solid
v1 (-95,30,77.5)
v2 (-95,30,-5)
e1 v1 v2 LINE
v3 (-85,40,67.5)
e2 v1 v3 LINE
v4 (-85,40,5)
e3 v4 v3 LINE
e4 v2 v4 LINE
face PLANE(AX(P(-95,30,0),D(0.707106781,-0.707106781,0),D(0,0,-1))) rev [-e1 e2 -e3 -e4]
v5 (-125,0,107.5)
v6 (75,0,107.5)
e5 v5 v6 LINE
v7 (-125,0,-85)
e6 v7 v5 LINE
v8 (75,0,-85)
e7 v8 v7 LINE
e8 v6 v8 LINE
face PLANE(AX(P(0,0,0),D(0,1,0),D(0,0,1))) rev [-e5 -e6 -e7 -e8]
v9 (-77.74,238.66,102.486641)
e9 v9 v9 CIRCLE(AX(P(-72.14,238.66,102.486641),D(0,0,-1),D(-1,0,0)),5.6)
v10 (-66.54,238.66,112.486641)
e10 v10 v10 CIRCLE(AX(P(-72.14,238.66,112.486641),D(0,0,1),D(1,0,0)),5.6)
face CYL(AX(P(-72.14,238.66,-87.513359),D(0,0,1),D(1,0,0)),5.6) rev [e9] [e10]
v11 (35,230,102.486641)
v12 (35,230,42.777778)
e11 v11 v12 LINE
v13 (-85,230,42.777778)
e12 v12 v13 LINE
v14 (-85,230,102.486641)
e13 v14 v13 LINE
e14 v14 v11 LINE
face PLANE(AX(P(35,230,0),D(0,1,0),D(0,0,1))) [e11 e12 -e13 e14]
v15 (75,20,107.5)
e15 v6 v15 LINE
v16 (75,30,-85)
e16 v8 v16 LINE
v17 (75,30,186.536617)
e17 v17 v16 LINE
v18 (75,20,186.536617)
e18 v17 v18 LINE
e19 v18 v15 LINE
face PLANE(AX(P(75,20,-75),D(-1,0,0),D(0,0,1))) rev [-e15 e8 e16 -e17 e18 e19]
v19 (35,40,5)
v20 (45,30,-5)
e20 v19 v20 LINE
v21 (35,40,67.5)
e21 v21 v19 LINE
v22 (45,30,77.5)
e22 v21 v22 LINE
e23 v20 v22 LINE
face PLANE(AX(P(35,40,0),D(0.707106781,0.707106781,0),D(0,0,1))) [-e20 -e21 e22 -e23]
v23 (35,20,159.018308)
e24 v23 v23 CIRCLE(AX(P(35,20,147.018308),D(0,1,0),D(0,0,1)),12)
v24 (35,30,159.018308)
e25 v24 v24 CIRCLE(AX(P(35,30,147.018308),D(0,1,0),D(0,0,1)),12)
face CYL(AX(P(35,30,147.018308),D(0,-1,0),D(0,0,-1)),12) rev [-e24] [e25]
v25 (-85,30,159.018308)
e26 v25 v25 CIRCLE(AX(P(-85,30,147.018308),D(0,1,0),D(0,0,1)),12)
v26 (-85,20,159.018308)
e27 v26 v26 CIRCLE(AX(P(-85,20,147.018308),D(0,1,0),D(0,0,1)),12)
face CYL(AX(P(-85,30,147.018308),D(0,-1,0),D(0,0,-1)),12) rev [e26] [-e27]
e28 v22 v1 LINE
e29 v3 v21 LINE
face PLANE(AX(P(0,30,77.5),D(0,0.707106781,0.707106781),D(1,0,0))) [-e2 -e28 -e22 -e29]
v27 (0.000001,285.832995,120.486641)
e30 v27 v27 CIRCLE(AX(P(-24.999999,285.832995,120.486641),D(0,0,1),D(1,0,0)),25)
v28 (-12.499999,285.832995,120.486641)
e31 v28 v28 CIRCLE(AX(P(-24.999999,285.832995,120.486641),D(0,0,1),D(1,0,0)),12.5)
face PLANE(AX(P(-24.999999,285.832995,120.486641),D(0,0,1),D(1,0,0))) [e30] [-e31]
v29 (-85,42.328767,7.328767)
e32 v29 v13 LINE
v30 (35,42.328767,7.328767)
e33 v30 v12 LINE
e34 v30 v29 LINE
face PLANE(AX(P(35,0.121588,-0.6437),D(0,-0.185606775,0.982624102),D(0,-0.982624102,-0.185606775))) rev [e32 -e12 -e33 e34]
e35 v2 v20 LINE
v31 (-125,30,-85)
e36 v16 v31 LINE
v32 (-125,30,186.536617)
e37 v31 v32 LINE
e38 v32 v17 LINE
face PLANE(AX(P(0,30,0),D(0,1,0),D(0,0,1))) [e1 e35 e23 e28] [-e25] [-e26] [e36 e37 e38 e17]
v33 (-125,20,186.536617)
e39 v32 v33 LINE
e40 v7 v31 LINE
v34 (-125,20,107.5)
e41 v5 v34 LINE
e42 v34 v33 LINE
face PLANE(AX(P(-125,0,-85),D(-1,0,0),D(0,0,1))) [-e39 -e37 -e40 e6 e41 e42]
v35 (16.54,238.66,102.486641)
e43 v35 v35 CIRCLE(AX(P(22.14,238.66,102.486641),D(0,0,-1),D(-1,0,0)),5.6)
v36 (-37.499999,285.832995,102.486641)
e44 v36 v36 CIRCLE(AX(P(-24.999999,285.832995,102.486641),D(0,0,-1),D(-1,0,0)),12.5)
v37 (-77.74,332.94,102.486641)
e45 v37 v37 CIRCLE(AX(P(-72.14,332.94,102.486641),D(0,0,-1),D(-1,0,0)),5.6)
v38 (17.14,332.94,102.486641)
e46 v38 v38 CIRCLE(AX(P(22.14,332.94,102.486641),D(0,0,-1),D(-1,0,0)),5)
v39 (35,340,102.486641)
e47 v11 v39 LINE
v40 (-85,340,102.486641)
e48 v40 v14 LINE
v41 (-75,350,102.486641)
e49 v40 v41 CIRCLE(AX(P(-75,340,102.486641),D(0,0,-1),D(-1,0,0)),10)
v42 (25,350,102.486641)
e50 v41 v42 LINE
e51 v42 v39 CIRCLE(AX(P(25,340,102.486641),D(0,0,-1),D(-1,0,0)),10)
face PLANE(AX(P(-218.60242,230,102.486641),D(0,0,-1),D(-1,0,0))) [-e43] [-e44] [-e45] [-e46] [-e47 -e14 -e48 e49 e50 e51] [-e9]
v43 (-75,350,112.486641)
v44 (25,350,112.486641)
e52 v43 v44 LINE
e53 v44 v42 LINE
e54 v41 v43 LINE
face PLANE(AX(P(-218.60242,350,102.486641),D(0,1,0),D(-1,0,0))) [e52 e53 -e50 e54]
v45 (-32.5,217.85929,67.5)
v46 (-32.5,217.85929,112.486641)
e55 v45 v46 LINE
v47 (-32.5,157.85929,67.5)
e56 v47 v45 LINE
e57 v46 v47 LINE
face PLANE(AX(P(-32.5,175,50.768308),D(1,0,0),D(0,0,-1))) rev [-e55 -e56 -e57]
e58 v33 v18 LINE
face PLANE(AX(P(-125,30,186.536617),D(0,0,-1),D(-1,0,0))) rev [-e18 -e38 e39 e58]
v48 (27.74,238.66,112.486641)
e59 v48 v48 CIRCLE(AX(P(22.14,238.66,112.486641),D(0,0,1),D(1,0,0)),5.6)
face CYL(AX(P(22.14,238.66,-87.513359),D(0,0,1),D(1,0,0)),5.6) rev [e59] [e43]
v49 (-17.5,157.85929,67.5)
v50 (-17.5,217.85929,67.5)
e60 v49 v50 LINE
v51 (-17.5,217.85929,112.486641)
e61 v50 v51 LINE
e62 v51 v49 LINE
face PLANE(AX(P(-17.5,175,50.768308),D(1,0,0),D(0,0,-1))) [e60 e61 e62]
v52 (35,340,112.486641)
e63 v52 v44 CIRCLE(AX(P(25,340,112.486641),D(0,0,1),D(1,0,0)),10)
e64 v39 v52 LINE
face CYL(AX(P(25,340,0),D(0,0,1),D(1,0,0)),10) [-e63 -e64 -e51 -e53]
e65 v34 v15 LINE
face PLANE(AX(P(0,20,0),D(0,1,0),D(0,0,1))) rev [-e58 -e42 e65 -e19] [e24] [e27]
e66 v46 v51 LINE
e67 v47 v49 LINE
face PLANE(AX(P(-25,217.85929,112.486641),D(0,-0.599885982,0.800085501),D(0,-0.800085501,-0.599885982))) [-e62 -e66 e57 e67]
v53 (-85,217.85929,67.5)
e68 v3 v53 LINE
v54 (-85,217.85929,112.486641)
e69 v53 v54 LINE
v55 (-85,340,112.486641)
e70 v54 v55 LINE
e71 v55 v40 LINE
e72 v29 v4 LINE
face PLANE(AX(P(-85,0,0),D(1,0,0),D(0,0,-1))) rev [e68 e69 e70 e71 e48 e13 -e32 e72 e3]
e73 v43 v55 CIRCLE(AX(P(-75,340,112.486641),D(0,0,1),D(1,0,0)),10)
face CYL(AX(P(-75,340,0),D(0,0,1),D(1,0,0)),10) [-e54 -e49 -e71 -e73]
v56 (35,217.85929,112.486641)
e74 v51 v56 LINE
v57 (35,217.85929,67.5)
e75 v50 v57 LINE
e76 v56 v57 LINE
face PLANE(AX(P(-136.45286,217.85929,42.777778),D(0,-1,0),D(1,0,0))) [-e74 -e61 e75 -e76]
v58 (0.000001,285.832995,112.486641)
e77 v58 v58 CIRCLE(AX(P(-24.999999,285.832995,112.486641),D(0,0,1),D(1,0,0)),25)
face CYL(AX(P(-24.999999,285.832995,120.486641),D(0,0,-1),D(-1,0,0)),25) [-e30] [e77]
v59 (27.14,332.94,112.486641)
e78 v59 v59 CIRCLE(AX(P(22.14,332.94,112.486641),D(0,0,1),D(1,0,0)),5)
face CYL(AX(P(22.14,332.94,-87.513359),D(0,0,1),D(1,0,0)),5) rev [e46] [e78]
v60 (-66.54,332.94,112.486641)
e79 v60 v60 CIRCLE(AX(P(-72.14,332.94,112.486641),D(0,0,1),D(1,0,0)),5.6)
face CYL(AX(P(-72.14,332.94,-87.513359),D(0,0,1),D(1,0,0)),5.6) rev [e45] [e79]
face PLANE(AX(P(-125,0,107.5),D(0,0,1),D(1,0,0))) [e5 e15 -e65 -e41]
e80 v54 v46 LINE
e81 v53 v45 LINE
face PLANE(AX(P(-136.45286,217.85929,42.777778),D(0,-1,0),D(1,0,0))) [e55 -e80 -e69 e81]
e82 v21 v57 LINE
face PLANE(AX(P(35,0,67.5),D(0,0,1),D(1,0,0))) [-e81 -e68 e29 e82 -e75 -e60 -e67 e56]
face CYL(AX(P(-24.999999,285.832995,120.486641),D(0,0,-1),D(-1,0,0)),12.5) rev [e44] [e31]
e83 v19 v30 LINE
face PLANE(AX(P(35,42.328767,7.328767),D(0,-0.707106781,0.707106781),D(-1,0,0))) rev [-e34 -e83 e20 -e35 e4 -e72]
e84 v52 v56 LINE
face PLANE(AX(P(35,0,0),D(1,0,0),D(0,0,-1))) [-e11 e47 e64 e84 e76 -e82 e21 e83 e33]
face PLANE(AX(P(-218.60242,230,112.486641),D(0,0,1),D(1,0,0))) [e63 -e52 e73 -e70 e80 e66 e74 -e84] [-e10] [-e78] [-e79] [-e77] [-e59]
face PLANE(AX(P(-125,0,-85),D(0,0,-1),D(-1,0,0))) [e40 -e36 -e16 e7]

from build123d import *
from OCP.BRepFilletAPI import BRepFilletAPI_MakeChamfer
from build123d.topology import SkipClean

# Parameters (mm, degrees)
SKETCH_1_W               = 150
SKETCH_1_H               = 150
EXTRUDE_1_DEPTH          = 20
SKETCH_2_W               = 200
SKETCH_2_H               = 170
EXTRUDE_2_DEPTH          = 20
SKETCH_3_W               = 200
SKETCH_3_H               = 22.5
EXTRUDE_3_DEPTH          = 20
SKETCH_4_W               = 200
SKETCH_4_H               = 101.536616744
SKETCH_4_R               = 12
EXTRUDE_4_DEPTH          = 10
SKETCH_5_W               = 200
SKETCH_5_H               = 170
EXTRUDE_5_DEPTH          = 10
SKETCH_6_W               = 12.361111111
SKETCH_6_H               = 120
EXTRUDE_6_DEPTH          = 60
CHAMFER_1_SIZE           = 10
CHAMFER_1_SIZE2          = 12.546778674
SKETCH_8_R               = 12.5
CUT_EXTRUDE_1_DEPTH      = 200
SKETCH_9_R               = 5.6
CUT_EXTRUDE_2_DEPTH      = 200
FILLET_1_R               = 10
SKETCH_10_R              = 40
SKETCH_10_R_2            = 8.532995409
EXTRUDE_7_DEPTH          = 5
SKETCH_11_R              = 12.5
CUT_EXTRUDE_3_DEPTH      = 200
SKETCH_12_W              = 50
SKETCH_12_H              = 12.140710291
EXTRUDE_8_DEPTH          = 120
EXTRUDE_9_DEPTH          = 120
SKETCH_14_R              = 5
SKETCH_14_R_2            = 5.6
CUT_EXTRUDE_4_DEPTH      = 200
CUT_EXTRUDE_5_DEPTH      = 428.663313117
CUT_EXTRUDE_5_DEPTH_BACK = 428.663313117
SKETCH_16_W              = 64.88929467
SKETCH_16_H              = 154.650571828
SKETCH_17_R              = 25
SKETCH_17_R_2            = 12.5
EXTRUDE_11_DEPTH         = 8
FILLET_2_R               = 10
RIB_1_REACH              = 411.018
SKETCH_18_WALL_W         = 895.028437604
SKETCH_18_WALL_H         = 15
CUT_EXTRUDE_6_DEPTH      = 425.676064177
CUT_EXTRUDE_6_DEPTH_BACK = 425.676064177
SKETCH_19_R              = 12.5


with BuildPart() as part:
    # 草图1 → 凸台-拉伸1 (new body)
    with BuildSketch(Plane(origin=(0, 0, 0), x_dir=(1, 0, 0), z_dir=(0, 1, 0))):
        Rectangle(SKETCH_1_W, SKETCH_1_H)
    extrude(amount=EXTRUDE_1_DEPTH)

    # 草图2 → 凸台-拉伸2 (add)
    with BuildSketch(Plane(origin=(0, 20, 0), x_dir=(1, 0, 0), z_dir=(0, 1, 0))):
        with Locations((-25, 0)):
            Rectangle(SKETCH_2_W, SKETCH_2_H)
    extrude(amount=-EXTRUDE_2_DEPTH)

    # 草图3 → 凸台-拉伸3 (add)
    with BuildSketch(Plane(origin=(0, 20, 0), x_dir=(1, 0, 0), z_dir=(0, 1, 0))):
        with Locations((-25, -96.25)):
            Rectangle(SKETCH_3_W, SKETCH_3_H)
    extrude(amount=-EXTRUDE_3_DEPTH)

    # 草图4 → 凸台-拉伸4 (add)
    with BuildSketch(Plane(origin=(0, 20, 0), x_dir=(1, 0, 0), z_dir=(0, 1, 0))):
        with Locations((-25, -135.768308372)):
            Rectangle(SKETCH_4_W, SKETCH_4_H)
        with Locations(Location((35, -147.018308372, 0), (0, 0, 270))):
            Circle(SKETCH_4_R, mode=Mode.SUBTRACT)
        with Locations(Location((-85, -147.018308372, 0), (0, 0, 270))):
            Circle(SKETCH_4_R, mode=Mode.SUBTRACT)
    extrude(amount=EXTRUDE_4_DEPTH)

    # 草图5 → 凸台-拉伸5 (add)
    with BuildSketch(Plane(origin=(0, 20, 0), x_dir=(1, 0, 0), z_dir=(0, 1, 0))):
        with Locations((-25, 0)):
            Rectangle(SKETCH_5_W, SKETCH_5_H)
    extrude(amount=EXTRUDE_5_DEPTH)

    # 草图6 → 凸台-拉伸6 (add, symmetric)
    with BuildSketch(Plane(origin=(-25, 0, 0), x_dir=(0, 0, -1), z_dir=(1, 0, 0))):
        Polygon((-67.5, 30), (-5, 30), (-42.777777778, 230), (-67.5, 230), align=None)
        with Locations((-61.319444445, 290)):
            Rectangle(SKETCH_6_W, SKETCH_6_H)
    extrude(amount=EXTRUDE_6_DEPTH, both=True)

    # 倒角1: one chamfer whose edges measure the first distance from different faces: ONE call of the kernel's chamfer builder (chamfer() names one face for all edges)
    chamfer_1_edges_1 = [part.edges().sort_by_distance(p)[0] for p in [
        (-85, 30, 36.25),
        (-25, 30, 67.5),
        (35, 30, 36.25),
    ]]
    chamfer_1_edges_2 = [part.edges().sort_by_distance(p)[0] for p in [
        (-25, 30, 5),
    ]]
    chamfer_1_side_2 = [part.faces().sort_by_distance(p)[0] for p in [
        (-121.627580479, 30, 50.768308372),
    ]]
    chamfer_1 = BRepFilletAPI_MakeChamfer(part.part.solid().wrapped)
    for e in chamfer_1_edges_1:
        chamfer_1.Add(CHAMFER_1_SIZE, e.wrapped)
    for e in chamfer_1_edges_2:
        chamfer_1.Add(CHAMFER_1_SIZE, CHAMFER_1_SIZE2, e.wrapped, chamfer_1_side_2[0].wrapped)  # the first distance lies on this face
    add(Compound.cast(chamfer_1.Shape()), mode=Mode.REPLACE)

    # 草图8 → 切除-拉伸1 (cut)
    with BuildSketch(Plane.XY.offset(67.5)):
        with Locations((-25, 285.8)):
            Circle(SKETCH_8_R)
    extrude(amount=-CUT_EXTRUDE_1_DEPTH, mode=Mode.SUBTRACT)

    # 草图9 → 切除-拉伸2 (cut)
    with BuildSketch(Plane.XY.offset(67.5)):
        with Locations((-72.14, 333.54)):
            Circle(SKETCH_9_R)
        with Locations((-72.14, 239.26)):
            Circle(SKETCH_9_R)
        with Locations((22.14, 239.26)):
            Circle(SKETCH_9_R)
        with Locations((22.14, 333.54)):
            Circle(SKETCH_9_R)
    extrude(amount=-CUT_EXTRUDE_2_DEPTH, mode=Mode.SUBTRACT)

    # 圆角1
    fillet_1_edges = [part.edges().sort_by_distance(p)[0] for p in [
        (35, 350, 61.319444444),
        (-85, 350, 61.319444444),
    ]]
    fillet(fillet_1_edges, radius=FILLET_1_R)

    # 草图10 → 凸台-拉伸7 (add)
    with BuildSketch(Plane.XY.offset(67.5)):
        with Locations((-25, 285.8)):
            Circle(SKETCH_10_R)
        with Locations((-25, 285.8)):
            Circle(SKETCH_10_R_2, mode=Mode.SUBTRACT)
    extrude(amount=EXTRUDE_7_DEPTH)

    # 草图11 → 切除-拉伸3 (cut)
    with BuildSketch(Plane.XY.offset(72.5)):
        with Locations((-25, 285.8)):
            Circle(SKETCH_11_R)
    extrude(amount=-CUT_EXTRUDE_3_DEPTH, mode=Mode.SUBTRACT)

    # 草图12 → 凸台-拉伸8 (add)
    with BuildSketch(Plane(origin=(35, 0, 0), x_dir=(0, 0, -1), z_dir=(1, 0, 0))):
        with Locations((-67.777777778, 223.929644855)):
            Rectangle(SKETCH_12_W, SKETCH_12_H)
    extrude(amount=-EXTRUDE_8_DEPTH)

    # 草图13 → 凸台-拉伸9 (add)
    with BuildSketch(Plane(origin=(35, 0, 0), x_dir=(0, 0, -1), z_dir=(1, 0, 0))):
        Polygon((-92.777777778, 230), (-102.486640647, 230), (-102.486640647, 350), (-112.486640647, 350), (-112.486640647, 230), (-112.486640647, 217.859289709), (-92.777777778, 217.859289709), align=None)
    extrude(amount=-EXTRUDE_9_DEPTH)

    # 草图14 → 切除-拉伸4 (cut)
    with BuildSketch(Plane.XY.offset(112.486640647)):
        with Locations((22.14, 332.94)):
            Circle(SKETCH_14_R)
        with Locations((22.14, 238.66)):
            Circle(SKETCH_14_R_2)
        with Locations((-72.14, 238.66)):
            Circle(SKETCH_14_R_2)
        with Locations((-72.14, 332.94)):
            Circle(SKETCH_14_R_2)
    extrude(amount=-CUT_EXTRUDE_4_DEPTH, mode=Mode.SUBTRACT)

    # 草图16 → 切除-拉伸5 (cut, two sides: drawn at the far end of the back side and taken through both)
    with BuildSketch(Plane.ZY.offset(85).offset(-CUT_EXTRUDE_5_DEPTH_BACK)):
        with Locations((49.451016332, 307.325285914)):
            Rectangle(SKETCH_16_W, SKETCH_16_H)
    extrude(amount=CUT_EXTRUDE_5_DEPTH + CUT_EXTRUDE_5_DEPTH_BACK, mode=Mode.SUBTRACT)

    # 草图17 → 凸台-拉伸11 (add)
    with BuildSketch(Plane.XY.offset(112.486640647)):
        with Locations((-24.999999135, 285.832995409)):
            Circle(SKETCH_17_R)
        with Locations((-24.999999135, 285.832995409)):
            Circle(SKETCH_17_R_2, mode=Mode.SUBTRACT)
    extrude(amount=EXTRUDE_11_DEPTH)

    # 圆角2
    fillet_2_edges = [part.edges().sort_by_distance(p)[0] for p in [
        (35, 350, 107.486640647),
        (-85, 350, 107.486640647),
    ]]
    fillet(fillet_2_edges, radius=FILLET_2_R)

    # 草图18 wall → 筋1 (add, up to next)
    with BuildSketch(Plane(origin=(-25, 187.859289709, 89.993320324), x_dir=(0, -0.800085500873, -0.599885981911), z_dir=(0, 0.599885981911, -0.800085500873)), mode=Mode.PRIVATE) as rib_1_sk1:
        Rectangle(SKETCH_18_WALL_W, SKETCH_18_WALL_H)
    rib_1_tool1 = extrude(rib_1_sk1.sketch, amount=RIB_1_REACH, mode=Mode.PRIVATE) - part.part
    add(rib_1_tool1.solids().sort_by_distance((-25, 187.859289709, 89.993320324))[0])

    # 草图19 → 切除-拉伸6 (cut, two sides: drawn at the far end of the back side and taken through both)
    with SkipClean():  # the faces are left unmerged after this step: merging them gives an invalid solid
        with BuildSketch(Plane.XY.offset(120.486640647).offset(-CUT_EXTRUDE_6_DEPTH_BACK)):
            with Locations(Location((-24.999999135, 285.832995409, 0), (0, 0, 180))):
                Circle(SKETCH_19_R)
        extrude(amount=CUT_EXTRUDE_6_DEPTH + CUT_EXTRUDE_6_DEPTH_BACK, mode=Mode.SUBTRACT)
    add(part.part.scale(1), mode=Mode.REPLACE)  # the faces are merged on a copy


solid = part.part
